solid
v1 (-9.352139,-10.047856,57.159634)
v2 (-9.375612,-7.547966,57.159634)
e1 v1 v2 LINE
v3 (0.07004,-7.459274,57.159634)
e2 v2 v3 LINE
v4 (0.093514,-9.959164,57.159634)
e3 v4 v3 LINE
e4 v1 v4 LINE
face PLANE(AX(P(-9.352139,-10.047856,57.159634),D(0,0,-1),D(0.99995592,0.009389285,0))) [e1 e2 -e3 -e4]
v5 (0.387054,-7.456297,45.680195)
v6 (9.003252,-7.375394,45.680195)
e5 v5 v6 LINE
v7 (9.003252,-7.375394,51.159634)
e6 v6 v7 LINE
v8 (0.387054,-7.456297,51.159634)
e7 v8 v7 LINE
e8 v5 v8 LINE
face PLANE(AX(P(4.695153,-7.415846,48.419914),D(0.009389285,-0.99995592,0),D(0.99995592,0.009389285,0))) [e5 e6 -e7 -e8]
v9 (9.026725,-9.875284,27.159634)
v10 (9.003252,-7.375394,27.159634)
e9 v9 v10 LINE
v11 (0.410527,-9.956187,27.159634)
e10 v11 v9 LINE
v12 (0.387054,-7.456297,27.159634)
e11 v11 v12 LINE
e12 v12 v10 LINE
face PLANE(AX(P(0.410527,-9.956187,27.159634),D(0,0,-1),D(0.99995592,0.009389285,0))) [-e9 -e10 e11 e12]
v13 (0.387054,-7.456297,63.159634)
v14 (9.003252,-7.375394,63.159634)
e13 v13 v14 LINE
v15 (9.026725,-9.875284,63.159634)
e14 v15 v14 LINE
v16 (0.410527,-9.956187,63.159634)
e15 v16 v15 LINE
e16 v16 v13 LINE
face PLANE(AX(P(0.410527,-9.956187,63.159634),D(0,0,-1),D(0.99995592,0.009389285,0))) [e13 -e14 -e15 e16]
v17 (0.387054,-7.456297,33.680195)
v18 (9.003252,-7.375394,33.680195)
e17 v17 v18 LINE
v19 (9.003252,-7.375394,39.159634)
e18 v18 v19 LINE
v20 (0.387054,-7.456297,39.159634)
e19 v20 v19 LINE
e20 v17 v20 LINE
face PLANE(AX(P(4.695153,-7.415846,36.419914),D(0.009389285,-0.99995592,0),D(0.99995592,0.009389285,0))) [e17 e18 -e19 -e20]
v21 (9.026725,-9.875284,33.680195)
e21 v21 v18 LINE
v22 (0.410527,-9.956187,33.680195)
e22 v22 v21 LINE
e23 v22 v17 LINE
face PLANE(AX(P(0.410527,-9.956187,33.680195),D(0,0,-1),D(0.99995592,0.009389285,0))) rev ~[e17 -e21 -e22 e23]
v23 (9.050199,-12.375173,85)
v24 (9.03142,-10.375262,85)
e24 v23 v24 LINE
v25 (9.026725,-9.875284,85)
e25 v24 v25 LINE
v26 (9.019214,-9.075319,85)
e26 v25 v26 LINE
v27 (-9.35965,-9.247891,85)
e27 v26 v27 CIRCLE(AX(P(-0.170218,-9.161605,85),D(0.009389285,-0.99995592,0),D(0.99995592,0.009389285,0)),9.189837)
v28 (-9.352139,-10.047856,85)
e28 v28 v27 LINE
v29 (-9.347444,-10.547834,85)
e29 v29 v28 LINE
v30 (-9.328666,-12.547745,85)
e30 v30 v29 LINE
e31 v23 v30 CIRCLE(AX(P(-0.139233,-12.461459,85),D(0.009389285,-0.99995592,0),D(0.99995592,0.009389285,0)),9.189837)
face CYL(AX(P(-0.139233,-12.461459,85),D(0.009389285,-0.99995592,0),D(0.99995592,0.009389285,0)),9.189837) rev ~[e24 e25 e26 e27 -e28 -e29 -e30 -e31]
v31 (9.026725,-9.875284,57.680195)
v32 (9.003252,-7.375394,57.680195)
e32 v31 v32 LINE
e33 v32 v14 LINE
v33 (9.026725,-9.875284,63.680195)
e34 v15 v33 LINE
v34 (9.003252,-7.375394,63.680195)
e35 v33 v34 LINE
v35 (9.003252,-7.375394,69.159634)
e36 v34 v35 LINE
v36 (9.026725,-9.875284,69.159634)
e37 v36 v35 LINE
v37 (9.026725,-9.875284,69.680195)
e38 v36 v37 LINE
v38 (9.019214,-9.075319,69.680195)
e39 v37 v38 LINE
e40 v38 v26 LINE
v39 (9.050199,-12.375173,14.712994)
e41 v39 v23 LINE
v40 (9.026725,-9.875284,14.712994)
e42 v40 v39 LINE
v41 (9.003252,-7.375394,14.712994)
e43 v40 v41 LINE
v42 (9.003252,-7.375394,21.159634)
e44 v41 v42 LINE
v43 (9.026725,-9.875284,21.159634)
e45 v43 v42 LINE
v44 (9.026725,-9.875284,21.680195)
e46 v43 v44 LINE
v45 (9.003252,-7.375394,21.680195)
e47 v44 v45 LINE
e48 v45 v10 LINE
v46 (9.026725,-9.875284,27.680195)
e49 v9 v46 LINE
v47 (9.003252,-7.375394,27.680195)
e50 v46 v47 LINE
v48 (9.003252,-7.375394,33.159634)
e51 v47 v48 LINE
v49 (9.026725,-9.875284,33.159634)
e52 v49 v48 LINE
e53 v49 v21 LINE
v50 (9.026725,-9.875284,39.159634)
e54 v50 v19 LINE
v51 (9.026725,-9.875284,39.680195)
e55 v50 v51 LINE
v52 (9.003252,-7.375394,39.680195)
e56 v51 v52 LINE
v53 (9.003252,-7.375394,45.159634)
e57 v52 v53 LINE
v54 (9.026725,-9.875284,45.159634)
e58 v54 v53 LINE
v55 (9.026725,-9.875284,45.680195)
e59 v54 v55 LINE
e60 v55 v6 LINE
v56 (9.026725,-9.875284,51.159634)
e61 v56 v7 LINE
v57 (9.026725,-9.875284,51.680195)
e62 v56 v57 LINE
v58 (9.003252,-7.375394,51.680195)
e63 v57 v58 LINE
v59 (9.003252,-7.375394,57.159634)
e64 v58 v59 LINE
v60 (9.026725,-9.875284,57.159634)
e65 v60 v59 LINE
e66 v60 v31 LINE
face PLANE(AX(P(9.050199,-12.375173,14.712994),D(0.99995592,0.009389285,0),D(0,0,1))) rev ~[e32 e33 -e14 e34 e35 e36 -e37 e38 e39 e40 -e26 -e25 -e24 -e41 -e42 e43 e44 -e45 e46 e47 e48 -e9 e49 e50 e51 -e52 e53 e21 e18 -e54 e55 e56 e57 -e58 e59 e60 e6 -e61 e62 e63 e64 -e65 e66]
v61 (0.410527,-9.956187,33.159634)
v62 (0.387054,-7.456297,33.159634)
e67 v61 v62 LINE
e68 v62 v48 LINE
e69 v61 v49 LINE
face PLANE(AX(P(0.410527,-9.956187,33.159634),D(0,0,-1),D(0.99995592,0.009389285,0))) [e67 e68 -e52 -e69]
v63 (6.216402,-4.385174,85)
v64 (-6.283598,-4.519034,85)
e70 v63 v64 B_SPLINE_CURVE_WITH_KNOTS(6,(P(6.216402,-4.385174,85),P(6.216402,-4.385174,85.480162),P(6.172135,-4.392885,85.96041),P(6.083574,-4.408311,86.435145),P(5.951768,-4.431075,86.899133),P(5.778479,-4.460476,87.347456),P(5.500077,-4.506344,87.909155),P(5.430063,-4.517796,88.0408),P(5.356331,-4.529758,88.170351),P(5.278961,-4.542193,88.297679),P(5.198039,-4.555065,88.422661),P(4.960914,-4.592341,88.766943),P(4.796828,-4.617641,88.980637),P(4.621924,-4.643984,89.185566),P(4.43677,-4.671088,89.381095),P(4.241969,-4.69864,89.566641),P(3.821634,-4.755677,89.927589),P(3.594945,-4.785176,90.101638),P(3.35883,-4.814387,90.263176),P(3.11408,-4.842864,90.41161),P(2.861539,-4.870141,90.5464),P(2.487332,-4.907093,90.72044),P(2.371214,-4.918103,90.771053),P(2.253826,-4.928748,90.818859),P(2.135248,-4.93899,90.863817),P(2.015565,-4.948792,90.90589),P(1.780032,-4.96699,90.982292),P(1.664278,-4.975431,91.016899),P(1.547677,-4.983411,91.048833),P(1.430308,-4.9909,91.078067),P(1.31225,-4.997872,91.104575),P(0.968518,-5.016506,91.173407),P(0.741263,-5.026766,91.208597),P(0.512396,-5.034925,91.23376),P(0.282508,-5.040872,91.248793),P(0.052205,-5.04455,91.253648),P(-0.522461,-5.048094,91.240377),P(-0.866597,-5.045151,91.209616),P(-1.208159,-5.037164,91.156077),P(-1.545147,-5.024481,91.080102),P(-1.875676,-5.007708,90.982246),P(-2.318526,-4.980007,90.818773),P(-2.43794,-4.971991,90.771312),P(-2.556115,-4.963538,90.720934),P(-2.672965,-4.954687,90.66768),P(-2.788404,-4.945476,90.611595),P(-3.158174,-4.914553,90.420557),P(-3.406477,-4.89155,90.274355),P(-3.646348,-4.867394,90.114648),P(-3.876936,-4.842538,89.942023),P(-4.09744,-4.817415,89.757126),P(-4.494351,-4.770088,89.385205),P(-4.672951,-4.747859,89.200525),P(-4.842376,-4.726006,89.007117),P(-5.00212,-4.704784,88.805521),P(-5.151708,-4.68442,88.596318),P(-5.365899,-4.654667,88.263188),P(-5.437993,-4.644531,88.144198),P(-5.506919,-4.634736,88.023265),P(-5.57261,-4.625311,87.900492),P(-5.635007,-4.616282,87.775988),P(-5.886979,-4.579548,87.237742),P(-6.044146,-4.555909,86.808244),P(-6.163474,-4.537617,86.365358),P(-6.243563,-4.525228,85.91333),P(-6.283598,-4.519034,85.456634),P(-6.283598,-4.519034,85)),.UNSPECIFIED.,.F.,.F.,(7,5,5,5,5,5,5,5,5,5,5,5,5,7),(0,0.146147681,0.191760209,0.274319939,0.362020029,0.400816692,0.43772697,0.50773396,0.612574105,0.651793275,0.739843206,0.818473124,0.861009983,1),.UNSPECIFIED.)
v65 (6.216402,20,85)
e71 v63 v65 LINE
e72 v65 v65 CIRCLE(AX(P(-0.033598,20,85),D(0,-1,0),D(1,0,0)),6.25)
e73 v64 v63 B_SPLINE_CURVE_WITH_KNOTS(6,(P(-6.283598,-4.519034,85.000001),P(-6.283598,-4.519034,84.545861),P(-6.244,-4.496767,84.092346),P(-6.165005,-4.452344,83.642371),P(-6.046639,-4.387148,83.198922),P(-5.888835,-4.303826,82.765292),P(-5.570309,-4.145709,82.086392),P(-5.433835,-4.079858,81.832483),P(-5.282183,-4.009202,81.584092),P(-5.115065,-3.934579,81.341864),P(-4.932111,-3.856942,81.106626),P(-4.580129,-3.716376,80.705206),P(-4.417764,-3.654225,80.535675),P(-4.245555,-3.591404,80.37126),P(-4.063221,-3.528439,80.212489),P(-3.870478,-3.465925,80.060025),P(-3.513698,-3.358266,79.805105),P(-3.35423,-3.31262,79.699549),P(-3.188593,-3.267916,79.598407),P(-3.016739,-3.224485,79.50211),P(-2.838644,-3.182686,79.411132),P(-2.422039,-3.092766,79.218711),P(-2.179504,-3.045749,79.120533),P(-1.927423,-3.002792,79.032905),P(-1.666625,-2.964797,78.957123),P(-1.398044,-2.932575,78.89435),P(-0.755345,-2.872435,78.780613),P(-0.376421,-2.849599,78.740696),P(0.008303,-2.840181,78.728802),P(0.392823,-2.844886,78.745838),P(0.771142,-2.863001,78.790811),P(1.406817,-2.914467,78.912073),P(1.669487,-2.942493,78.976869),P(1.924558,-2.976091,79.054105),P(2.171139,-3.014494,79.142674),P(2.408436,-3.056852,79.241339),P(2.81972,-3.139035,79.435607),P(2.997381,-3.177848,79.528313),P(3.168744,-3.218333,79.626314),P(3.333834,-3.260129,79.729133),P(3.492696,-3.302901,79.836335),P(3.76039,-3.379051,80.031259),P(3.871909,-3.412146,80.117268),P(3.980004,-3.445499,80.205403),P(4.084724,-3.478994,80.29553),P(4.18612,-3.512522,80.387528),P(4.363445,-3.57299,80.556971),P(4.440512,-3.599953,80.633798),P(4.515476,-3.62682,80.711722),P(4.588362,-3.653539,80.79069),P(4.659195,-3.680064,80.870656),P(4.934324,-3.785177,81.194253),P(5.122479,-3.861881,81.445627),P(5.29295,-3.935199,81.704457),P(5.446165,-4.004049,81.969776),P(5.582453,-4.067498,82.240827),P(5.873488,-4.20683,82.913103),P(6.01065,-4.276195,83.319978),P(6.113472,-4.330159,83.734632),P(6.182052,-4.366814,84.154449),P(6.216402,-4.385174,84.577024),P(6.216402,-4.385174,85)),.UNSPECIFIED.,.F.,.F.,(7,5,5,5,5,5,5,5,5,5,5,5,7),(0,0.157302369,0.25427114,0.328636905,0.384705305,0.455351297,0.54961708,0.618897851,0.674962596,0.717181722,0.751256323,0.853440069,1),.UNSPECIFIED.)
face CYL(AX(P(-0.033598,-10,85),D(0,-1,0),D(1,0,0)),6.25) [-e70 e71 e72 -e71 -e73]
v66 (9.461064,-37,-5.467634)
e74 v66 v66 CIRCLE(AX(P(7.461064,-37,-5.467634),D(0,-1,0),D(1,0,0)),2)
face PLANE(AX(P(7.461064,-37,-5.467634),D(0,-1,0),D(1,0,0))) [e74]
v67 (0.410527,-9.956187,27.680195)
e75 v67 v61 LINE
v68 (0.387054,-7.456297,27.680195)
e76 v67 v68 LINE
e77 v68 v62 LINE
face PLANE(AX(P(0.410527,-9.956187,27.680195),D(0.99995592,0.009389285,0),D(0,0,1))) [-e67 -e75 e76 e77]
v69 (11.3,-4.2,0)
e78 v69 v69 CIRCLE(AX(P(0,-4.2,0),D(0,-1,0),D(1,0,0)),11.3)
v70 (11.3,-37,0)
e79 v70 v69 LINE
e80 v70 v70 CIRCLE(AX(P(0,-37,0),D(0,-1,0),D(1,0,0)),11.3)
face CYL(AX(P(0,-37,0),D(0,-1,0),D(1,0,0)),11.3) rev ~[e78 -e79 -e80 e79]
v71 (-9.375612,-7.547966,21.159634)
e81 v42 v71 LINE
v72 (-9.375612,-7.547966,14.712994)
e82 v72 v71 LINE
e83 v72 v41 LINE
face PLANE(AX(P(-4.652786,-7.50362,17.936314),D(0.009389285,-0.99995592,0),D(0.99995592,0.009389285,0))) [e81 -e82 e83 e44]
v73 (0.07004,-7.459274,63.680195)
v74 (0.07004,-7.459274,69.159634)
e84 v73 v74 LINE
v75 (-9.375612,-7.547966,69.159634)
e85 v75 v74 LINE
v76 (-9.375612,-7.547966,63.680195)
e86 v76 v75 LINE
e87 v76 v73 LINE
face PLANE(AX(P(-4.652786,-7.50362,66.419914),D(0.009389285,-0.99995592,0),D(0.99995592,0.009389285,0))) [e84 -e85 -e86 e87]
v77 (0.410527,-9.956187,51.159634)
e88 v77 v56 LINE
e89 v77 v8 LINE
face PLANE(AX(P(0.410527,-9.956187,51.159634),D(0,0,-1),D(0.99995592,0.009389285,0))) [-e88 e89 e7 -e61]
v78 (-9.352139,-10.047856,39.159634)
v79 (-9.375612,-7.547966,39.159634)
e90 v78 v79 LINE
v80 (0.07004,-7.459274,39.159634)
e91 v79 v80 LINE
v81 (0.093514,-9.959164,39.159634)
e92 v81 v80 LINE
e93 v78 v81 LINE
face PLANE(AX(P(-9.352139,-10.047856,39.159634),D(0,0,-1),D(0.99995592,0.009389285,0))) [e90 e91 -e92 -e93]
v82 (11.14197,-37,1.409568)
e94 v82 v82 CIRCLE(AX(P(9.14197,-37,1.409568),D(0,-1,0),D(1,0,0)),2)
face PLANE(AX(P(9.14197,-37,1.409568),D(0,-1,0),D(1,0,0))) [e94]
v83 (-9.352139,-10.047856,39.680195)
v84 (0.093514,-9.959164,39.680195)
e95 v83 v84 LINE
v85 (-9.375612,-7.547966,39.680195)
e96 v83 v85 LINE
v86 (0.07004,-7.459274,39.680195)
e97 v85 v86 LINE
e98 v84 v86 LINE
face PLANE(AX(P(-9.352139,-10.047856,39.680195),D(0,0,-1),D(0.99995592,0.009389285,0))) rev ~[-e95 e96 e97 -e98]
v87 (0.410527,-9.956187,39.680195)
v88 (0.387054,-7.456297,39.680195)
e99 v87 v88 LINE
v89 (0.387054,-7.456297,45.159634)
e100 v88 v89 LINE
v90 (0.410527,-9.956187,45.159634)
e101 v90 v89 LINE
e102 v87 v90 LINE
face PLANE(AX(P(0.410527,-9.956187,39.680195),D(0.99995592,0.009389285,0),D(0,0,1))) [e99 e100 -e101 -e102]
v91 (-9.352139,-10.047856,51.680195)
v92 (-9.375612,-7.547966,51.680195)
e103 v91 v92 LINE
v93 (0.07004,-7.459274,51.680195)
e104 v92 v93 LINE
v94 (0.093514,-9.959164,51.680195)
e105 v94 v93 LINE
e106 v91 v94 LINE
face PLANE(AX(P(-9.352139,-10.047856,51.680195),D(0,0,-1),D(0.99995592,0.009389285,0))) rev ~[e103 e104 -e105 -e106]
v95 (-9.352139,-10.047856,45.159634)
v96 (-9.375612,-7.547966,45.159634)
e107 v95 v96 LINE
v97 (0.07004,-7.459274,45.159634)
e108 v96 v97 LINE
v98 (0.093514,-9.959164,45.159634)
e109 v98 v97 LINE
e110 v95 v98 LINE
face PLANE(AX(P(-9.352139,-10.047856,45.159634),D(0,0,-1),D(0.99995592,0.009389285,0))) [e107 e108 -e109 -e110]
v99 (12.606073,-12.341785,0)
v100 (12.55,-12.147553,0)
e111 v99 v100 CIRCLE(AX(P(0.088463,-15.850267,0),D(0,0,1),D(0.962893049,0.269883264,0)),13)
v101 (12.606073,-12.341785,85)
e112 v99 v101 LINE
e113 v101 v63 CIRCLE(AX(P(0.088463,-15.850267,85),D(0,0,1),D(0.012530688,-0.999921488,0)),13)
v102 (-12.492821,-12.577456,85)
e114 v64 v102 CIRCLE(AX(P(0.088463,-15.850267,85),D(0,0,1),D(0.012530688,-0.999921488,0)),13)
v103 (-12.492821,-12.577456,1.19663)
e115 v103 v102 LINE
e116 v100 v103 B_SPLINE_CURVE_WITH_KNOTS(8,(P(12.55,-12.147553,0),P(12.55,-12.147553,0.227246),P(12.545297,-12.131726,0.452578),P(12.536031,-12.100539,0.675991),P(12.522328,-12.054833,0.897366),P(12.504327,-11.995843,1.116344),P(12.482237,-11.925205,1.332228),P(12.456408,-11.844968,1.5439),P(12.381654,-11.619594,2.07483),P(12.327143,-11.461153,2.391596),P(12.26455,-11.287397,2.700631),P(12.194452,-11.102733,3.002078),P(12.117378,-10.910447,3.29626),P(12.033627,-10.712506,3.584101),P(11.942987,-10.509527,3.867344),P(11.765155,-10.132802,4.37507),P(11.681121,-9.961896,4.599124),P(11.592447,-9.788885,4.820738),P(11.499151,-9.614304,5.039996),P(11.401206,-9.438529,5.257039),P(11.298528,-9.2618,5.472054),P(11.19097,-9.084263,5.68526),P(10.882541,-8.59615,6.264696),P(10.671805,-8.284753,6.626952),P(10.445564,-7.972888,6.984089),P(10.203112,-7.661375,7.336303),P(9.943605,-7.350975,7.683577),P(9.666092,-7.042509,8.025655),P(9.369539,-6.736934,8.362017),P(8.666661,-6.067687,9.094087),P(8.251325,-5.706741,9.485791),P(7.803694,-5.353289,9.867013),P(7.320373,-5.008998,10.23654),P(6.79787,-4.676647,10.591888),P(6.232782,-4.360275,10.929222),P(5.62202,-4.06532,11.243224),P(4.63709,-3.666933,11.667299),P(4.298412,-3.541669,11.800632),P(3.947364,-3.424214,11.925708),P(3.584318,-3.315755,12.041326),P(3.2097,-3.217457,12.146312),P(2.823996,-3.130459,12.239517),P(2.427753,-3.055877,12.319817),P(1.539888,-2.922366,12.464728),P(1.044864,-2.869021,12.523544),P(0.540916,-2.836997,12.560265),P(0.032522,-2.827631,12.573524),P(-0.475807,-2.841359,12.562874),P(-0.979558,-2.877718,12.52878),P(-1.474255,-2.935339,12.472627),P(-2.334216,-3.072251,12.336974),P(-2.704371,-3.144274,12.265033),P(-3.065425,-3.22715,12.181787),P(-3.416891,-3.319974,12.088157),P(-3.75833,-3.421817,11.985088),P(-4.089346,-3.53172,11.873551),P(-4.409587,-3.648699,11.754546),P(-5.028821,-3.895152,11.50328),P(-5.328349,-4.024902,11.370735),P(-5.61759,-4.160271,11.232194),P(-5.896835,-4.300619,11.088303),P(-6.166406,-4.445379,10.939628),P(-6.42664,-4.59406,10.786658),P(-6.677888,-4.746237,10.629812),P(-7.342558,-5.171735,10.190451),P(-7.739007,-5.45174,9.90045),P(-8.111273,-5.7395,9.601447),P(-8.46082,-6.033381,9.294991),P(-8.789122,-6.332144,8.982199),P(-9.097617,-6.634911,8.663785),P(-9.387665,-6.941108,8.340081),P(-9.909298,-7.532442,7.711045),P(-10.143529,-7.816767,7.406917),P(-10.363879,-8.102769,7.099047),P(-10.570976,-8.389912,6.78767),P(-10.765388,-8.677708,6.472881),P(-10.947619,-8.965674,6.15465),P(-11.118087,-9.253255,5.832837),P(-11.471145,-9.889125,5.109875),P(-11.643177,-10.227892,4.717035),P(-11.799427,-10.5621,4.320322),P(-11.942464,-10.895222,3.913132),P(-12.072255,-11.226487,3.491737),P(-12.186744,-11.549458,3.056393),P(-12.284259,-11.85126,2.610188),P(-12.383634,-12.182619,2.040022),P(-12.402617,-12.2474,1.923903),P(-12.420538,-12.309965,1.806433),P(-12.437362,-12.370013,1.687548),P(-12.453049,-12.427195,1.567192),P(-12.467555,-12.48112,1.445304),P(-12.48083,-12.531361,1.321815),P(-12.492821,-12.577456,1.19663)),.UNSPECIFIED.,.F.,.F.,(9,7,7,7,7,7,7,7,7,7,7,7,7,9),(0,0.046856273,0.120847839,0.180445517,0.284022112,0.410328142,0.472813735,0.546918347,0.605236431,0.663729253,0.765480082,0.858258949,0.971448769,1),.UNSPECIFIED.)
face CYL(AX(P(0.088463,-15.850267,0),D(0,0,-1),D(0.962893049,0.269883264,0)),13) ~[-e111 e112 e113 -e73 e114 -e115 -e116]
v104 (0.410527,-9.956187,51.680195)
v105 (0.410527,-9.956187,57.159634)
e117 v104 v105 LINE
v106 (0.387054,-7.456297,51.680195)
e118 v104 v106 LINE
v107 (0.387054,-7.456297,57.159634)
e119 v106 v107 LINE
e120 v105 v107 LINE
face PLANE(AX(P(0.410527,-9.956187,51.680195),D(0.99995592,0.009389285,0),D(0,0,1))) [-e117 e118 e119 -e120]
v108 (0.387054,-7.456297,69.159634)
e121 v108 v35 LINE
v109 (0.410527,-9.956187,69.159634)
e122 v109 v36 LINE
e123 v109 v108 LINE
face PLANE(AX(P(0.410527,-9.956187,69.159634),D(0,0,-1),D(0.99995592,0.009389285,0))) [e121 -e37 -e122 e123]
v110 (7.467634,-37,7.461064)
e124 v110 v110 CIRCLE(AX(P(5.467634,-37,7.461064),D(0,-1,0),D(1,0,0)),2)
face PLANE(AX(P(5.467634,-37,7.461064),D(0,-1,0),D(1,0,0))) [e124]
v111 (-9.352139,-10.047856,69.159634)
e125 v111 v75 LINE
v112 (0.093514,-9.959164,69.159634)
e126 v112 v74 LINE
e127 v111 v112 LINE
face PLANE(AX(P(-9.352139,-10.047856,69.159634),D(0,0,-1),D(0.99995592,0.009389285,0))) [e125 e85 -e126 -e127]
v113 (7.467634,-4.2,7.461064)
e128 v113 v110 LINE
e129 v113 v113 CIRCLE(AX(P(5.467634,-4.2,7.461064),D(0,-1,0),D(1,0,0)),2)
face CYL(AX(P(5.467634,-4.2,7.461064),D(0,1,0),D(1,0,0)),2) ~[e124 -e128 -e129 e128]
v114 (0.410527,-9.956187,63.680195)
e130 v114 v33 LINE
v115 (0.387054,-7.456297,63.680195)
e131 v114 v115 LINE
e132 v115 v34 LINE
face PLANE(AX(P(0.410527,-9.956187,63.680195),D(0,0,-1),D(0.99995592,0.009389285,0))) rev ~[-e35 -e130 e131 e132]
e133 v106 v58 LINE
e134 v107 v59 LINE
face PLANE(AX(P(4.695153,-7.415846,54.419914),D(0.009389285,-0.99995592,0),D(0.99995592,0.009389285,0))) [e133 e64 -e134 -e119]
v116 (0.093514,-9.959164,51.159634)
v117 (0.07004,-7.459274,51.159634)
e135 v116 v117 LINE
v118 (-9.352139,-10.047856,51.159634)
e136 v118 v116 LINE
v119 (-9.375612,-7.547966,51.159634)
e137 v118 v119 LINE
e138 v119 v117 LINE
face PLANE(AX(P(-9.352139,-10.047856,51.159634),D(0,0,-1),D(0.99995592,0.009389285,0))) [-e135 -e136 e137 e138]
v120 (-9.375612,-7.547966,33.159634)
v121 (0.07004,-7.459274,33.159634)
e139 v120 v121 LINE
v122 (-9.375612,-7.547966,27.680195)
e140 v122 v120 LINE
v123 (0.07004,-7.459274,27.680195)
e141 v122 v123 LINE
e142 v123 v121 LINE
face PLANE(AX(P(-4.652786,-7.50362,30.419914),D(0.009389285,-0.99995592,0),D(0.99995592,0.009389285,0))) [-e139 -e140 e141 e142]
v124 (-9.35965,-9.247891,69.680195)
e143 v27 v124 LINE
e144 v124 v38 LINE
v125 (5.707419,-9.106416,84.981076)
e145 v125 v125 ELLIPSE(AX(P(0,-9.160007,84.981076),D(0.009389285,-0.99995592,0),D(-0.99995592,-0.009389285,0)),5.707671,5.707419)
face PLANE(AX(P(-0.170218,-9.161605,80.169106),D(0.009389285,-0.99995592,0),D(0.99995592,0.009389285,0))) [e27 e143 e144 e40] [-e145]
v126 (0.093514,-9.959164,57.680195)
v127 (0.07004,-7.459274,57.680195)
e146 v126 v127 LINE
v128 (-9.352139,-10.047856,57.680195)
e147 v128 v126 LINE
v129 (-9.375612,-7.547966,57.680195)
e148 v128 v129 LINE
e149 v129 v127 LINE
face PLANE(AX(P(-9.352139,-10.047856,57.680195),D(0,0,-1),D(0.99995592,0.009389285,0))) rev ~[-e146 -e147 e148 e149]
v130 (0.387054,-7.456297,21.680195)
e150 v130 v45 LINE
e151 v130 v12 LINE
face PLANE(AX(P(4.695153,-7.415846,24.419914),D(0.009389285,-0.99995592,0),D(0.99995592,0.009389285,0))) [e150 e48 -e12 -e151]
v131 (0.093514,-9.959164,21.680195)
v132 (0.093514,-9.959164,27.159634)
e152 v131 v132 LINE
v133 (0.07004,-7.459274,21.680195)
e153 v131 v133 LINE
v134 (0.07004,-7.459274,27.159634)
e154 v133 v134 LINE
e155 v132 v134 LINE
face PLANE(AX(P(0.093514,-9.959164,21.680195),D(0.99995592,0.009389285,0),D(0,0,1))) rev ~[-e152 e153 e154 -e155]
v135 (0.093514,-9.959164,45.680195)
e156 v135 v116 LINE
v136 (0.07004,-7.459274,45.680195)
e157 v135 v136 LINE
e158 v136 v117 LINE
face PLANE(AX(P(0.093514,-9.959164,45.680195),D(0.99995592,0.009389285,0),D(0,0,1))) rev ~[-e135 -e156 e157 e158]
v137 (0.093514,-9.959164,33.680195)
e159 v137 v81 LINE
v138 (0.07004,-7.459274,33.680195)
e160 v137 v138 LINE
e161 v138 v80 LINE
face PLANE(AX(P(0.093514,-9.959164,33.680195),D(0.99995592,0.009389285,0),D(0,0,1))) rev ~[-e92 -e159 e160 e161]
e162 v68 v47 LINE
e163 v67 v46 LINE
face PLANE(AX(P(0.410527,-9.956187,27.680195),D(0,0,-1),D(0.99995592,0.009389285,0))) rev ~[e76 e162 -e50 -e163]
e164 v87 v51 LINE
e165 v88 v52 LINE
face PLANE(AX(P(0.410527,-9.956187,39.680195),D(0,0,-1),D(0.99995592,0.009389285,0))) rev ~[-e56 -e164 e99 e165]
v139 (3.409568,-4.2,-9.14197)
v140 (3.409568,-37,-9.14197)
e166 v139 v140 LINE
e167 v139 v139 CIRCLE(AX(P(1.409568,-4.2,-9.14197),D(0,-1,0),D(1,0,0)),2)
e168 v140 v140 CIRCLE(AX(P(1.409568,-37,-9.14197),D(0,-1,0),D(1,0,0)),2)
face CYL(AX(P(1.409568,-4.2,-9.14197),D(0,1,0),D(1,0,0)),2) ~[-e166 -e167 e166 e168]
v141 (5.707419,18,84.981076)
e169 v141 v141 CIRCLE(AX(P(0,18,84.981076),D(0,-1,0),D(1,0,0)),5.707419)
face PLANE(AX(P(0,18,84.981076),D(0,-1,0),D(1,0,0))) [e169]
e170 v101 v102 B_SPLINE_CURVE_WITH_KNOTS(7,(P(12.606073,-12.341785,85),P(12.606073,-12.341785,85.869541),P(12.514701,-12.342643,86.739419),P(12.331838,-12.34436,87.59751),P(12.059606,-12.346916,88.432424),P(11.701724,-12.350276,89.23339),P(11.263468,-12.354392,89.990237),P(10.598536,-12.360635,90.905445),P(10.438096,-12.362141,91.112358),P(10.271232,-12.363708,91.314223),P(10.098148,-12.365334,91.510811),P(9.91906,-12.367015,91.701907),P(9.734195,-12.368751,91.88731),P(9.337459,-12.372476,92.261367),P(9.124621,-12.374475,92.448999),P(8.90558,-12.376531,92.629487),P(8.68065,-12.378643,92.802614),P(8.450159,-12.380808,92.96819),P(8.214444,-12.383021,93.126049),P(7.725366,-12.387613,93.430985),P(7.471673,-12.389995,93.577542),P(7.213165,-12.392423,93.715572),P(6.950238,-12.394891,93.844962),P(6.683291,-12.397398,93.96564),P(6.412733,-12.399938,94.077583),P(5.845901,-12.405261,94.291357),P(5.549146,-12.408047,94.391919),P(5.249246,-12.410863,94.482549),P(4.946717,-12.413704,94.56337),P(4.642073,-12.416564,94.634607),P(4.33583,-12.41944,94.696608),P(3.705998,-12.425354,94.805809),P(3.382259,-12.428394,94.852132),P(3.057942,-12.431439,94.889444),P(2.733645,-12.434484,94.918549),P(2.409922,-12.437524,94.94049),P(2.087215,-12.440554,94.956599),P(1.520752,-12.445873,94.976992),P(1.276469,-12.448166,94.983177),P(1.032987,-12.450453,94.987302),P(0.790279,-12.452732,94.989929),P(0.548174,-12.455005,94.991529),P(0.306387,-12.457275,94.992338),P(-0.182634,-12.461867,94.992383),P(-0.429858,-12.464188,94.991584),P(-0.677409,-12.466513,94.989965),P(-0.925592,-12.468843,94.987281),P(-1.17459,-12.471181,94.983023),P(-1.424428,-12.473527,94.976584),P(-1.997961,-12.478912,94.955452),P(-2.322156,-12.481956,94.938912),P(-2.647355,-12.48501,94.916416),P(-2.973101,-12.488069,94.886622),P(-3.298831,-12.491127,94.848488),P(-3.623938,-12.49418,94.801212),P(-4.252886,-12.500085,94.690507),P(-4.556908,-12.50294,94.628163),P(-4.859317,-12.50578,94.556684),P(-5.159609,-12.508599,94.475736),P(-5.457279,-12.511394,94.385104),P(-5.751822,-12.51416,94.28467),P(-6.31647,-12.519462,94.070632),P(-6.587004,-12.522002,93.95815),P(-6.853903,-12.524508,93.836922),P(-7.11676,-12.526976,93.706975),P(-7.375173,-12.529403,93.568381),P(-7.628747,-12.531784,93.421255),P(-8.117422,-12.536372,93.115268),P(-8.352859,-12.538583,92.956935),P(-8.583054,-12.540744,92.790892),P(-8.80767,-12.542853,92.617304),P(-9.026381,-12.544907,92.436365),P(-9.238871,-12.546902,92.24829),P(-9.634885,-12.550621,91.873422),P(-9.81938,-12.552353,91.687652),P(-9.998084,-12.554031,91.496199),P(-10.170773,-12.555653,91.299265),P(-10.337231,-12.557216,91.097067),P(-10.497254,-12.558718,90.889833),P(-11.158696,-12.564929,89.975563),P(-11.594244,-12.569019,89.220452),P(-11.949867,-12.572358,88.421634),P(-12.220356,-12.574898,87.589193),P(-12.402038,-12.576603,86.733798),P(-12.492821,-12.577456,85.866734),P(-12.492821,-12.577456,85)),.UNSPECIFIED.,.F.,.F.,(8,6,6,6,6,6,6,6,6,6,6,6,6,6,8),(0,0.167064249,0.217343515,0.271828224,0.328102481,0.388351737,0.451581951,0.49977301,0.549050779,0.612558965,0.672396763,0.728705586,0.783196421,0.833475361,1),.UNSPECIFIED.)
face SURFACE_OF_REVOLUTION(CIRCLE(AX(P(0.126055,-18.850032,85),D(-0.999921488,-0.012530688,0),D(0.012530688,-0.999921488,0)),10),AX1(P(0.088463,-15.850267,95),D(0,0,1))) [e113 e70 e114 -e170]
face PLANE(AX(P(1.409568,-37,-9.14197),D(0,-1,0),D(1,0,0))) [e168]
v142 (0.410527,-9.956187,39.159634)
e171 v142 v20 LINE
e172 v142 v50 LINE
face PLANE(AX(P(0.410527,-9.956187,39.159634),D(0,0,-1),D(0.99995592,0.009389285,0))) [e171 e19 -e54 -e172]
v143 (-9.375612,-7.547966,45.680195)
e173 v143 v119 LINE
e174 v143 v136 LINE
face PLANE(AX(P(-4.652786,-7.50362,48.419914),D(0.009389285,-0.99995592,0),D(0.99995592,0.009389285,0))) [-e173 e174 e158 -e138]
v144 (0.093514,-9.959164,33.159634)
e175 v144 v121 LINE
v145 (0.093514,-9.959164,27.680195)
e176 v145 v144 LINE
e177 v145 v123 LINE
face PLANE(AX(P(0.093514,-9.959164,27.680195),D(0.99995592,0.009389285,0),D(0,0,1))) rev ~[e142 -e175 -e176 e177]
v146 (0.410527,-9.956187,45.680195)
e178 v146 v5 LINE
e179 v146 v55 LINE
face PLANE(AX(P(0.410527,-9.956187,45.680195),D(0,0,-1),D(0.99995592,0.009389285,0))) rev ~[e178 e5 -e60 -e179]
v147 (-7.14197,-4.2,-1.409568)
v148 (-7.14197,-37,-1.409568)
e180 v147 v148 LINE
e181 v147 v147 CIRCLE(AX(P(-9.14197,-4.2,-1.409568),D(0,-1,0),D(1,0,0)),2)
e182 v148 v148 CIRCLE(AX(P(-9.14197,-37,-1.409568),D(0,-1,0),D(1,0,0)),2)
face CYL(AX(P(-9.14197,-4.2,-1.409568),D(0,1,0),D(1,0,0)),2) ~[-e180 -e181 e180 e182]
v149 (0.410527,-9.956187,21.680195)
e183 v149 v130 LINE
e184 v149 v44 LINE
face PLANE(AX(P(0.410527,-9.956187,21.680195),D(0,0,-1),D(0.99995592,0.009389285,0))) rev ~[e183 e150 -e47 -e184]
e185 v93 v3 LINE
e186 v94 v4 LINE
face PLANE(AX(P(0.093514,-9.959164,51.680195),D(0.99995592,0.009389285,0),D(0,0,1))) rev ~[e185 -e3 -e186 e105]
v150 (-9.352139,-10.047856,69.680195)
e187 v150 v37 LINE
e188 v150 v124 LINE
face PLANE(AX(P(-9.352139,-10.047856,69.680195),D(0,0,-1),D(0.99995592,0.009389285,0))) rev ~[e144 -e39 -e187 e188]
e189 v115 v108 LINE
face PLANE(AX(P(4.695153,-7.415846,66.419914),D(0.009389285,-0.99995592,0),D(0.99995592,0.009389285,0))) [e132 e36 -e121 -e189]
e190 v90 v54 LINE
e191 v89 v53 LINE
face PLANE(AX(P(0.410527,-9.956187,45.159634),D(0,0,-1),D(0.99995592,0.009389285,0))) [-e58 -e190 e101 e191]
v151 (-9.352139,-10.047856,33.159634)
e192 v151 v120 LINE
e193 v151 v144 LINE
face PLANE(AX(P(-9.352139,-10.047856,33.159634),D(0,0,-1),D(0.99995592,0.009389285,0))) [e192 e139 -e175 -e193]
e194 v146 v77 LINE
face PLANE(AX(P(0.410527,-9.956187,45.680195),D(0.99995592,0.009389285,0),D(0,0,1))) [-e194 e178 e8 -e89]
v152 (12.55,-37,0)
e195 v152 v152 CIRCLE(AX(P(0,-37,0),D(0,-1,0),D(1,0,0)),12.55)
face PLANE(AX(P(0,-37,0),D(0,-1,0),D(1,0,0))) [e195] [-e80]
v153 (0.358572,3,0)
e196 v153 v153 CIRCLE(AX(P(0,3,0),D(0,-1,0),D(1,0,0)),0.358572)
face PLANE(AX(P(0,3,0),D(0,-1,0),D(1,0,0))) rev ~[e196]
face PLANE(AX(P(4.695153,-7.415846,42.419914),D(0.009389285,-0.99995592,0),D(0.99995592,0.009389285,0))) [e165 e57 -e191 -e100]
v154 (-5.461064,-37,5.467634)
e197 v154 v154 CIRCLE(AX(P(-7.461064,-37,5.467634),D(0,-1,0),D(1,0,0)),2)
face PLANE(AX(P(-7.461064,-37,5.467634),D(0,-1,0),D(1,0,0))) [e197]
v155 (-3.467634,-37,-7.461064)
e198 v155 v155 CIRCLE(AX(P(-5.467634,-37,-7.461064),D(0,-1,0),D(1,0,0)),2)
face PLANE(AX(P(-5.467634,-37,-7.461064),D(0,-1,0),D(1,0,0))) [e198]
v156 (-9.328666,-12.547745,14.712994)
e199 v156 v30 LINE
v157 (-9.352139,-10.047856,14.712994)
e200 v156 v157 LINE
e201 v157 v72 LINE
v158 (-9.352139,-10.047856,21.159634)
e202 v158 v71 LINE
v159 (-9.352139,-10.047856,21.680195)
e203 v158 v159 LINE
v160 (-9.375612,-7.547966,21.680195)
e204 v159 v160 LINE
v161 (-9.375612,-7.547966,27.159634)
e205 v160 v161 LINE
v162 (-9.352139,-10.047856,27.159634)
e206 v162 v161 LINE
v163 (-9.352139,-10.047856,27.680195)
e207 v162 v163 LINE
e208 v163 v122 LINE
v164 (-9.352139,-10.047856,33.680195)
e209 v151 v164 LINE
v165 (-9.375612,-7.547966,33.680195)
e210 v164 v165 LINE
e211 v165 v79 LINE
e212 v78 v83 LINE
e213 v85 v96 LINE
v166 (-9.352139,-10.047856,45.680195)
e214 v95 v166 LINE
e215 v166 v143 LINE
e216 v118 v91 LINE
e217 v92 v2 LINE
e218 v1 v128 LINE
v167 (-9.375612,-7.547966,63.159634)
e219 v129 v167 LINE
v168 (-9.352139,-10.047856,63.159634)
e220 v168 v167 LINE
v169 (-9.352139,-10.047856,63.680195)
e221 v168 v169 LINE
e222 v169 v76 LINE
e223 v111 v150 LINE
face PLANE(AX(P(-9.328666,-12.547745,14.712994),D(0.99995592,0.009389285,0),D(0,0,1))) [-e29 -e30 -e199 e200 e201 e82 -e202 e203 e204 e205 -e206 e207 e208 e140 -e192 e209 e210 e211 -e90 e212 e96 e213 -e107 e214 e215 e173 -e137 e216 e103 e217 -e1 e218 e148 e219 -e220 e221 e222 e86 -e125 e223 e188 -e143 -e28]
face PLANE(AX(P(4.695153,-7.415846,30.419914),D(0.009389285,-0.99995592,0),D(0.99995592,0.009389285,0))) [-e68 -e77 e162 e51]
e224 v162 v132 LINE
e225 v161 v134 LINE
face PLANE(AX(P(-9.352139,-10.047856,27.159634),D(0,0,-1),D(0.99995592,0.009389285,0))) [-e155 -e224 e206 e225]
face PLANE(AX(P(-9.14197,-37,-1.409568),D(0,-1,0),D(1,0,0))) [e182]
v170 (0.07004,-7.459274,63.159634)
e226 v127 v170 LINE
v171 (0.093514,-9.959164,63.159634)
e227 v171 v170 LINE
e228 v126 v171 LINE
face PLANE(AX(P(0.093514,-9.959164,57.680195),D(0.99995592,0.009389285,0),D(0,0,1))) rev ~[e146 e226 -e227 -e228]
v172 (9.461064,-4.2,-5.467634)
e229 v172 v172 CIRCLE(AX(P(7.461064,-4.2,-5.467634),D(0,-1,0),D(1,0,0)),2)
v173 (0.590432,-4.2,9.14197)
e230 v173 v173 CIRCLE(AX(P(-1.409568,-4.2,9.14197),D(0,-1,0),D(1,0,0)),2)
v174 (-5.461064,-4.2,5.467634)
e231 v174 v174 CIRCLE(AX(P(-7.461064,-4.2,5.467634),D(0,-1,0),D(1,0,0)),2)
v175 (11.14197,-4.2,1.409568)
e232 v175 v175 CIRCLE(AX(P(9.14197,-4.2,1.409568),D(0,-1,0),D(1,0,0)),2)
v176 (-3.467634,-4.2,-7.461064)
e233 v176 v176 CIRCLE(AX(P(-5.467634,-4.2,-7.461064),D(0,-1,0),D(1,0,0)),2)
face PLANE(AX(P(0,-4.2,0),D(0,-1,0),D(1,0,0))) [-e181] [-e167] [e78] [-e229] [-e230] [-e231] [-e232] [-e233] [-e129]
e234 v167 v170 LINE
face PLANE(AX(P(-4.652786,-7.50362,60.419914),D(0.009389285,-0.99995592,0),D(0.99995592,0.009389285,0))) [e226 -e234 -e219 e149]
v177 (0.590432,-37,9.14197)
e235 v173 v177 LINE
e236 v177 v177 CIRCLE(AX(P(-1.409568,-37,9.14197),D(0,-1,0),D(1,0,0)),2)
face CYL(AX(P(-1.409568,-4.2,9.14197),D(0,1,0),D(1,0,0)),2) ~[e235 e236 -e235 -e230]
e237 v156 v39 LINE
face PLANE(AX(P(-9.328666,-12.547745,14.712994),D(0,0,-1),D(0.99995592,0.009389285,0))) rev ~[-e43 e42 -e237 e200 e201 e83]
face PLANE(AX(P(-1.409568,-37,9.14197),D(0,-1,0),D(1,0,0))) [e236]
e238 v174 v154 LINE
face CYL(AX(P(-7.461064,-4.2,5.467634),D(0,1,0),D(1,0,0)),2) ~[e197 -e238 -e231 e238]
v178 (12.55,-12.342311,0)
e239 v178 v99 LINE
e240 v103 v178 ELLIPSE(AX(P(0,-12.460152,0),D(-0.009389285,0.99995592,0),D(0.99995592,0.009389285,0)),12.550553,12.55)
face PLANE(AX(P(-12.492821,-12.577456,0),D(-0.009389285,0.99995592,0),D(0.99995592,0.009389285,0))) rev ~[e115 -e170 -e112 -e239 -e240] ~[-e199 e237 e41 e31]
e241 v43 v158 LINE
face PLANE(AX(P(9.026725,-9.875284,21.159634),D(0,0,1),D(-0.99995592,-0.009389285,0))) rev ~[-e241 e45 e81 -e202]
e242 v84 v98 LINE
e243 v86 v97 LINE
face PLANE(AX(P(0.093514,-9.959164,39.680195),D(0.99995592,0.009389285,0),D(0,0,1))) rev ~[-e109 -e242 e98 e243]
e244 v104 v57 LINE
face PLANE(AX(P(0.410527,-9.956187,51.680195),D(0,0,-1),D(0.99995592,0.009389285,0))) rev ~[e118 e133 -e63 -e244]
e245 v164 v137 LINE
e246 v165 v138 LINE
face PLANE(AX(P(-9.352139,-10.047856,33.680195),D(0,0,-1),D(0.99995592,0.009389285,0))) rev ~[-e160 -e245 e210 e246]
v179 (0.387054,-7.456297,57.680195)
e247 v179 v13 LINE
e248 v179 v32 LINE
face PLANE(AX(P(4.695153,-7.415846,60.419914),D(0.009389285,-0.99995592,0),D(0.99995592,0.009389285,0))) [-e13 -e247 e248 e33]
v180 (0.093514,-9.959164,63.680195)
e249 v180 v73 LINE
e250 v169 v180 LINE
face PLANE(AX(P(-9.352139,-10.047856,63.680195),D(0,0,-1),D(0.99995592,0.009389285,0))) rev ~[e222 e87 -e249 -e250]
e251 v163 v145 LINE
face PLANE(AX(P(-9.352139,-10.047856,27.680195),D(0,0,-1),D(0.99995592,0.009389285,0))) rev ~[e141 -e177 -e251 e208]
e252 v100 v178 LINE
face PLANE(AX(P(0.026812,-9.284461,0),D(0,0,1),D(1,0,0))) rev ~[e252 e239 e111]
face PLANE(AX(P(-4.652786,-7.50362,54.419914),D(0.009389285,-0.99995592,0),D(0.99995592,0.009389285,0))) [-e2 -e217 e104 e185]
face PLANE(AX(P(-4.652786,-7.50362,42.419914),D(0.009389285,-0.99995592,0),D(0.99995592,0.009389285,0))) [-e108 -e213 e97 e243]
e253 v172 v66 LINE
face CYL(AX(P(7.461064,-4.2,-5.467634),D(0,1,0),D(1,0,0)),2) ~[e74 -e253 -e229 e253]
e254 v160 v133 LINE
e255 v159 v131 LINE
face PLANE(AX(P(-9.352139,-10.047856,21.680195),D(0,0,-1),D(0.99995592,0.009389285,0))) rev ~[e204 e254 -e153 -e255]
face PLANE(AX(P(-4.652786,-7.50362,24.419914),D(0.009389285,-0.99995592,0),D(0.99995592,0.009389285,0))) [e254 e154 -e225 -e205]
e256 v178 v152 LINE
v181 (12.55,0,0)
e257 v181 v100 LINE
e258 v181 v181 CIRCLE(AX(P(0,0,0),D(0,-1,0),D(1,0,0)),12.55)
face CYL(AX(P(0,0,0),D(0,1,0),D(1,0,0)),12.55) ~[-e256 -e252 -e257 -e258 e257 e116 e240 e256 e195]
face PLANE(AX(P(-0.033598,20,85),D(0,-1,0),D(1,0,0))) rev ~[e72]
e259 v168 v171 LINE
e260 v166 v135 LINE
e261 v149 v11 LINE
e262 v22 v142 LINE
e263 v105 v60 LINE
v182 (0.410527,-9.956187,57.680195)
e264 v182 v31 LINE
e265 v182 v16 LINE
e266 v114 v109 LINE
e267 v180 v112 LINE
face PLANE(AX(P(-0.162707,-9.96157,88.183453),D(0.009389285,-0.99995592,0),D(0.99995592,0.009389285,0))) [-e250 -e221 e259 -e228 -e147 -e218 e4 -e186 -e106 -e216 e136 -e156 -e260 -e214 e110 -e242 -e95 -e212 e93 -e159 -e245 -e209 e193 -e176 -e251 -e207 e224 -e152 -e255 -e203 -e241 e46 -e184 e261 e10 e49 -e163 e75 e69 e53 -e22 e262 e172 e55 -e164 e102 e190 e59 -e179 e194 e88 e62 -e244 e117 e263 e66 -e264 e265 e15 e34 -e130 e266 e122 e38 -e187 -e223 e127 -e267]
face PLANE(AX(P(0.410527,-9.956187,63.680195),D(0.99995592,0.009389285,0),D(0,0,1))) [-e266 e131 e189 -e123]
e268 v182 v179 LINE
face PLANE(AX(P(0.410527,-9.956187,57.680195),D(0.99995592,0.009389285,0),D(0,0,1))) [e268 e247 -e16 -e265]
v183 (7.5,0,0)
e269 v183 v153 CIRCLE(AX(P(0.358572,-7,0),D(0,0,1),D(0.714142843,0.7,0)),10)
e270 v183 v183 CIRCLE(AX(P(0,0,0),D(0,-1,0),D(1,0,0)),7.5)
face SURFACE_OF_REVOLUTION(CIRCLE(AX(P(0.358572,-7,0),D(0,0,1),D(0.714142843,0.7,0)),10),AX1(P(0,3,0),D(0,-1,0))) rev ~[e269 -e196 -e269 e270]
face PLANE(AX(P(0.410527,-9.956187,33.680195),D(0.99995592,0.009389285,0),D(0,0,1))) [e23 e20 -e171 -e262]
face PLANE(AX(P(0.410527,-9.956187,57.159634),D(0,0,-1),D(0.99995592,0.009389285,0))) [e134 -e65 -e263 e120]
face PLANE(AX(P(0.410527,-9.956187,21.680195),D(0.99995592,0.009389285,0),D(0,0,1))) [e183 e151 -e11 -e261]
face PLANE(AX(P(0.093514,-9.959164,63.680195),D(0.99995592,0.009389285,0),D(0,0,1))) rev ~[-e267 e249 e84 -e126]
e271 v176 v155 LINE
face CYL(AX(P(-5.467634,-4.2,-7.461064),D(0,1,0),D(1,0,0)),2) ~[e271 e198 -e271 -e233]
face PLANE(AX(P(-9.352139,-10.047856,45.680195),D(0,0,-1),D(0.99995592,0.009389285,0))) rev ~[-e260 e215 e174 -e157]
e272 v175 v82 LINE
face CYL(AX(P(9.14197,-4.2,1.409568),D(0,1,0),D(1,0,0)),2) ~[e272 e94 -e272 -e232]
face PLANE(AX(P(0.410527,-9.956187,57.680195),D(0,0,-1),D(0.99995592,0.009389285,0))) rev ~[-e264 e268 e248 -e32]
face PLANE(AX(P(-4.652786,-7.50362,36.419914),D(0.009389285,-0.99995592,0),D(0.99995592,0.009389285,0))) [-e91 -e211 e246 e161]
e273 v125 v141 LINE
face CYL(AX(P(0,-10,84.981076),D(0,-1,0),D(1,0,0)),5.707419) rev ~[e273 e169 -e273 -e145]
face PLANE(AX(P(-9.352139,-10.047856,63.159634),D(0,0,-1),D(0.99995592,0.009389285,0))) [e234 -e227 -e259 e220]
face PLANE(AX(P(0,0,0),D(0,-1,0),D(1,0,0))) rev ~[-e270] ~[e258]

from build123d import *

# Parameters (mm, degrees)
F0_R        = 12.55
F1_DEPTH    = 37
F2_R        = 7.5
F3_DEPTH    = 3
F6_DEPTH    = 95
F7_T2_ANGLE = 359.64
F9_R        = 6.25
F10_DEPTH   = 30
F11_W       = 18.3796742931
F11_H       = 70.2870060131
F12_DEPTH   = 2
F13_DEPTH   = 2.5
F14_W       = 9.4460686669
F14_H       = 6.4466400072
F14_H_2     = 5.4794391096
F14_W_2     = 8.6165779212
F14_W_3     = 0.317027705
F15_DEPTH   = 2.5
F16_DEPTH   = 0.8
F17_R       = 5.7074191609
F18_DEPTH   = 28
F19_R       = 11.3
F20_DEPTH   = 32.8
F21_R       = 2
F22_DEPTH   = 32.8


# Not quite as in the source:
# - a fillet or chamfer that OpenCascade refuses, or shapes differently, is made with other operations: its cross-section is extruded or revolved along the edge and cut away or added


with BuildPart() as f1:
    # F0 (on Front) → F1 (new body)
    with BuildSketch(Plane.XZ):
        Circle(F0_R)
    extrude(amount=F1_DEPTH)

    # F2 (on Front) → F3 (join)
    with BuildSketch(Plane.XZ):
        Circle(F2_R)
    extrude(amount=-F3_DEPTH)

    # F4: fillet of radius 10 on 1 edges, made by hand

    # F4_s1 → F4_t2 (revolve, cut)
    with BuildSketch(Plane.XY):
        with BuildLine():
            ThreePointArc((7.5, 0), (4.2315549177, 2.2195444573), (0.3585715715, 3))
            Line((0.3585715715, 3), (7.5, 3))
            Line((7.5, 3), (7.5, 0))
        make_face()
    revolve(axis=Axis((0, 3, 0), (0, -1, 0)), mode=Mode.SUBTRACT)

    # F5 (on Top) → F6 (join)
    with BuildSketch(Plane.XY):
        with BuildLine():
            Line((-12.4928209826, -12.5774559094), (12.6060726016, -12.3417848491))
            ThreePointArc((12.6060726016, -12.3417848491), (-0.0335977446, -2.8508403226), (-12.4928209826, -12.5774559094))
        make_face()
    extrude(amount=F6_DEPTH)

    # F7: fillet of radius 10 on 1 edges, made by hand

    # F7_s1 → F7_t2 (revolve, cut)
    with BuildSketch(Plane(origin=(-0.1101500857, -0.0013803647, 0), x_dir=(0, 0, 1), z_dir=(-0.9999214878, -0.0125306879, 0))):
        with BuildLine():
            ThreePointArc((85, -28.8501313418), (92.0710678119, -25.9211991536), (95, -18.8501313418))
            Line((95, -18.8501313418), (95, -28.8501313418))
            Line((95, -28.8501313418), (85, -28.8501313418))
        make_face()
    revolve(axis=Axis((0.0884629639, -15.8502672786, 95), (0, 0, 1)), revolution_arc=F7_T2_ANGLE, mode=Mode.SUBTRACT)

    # F9 (on offset) → F10 (join)
    with BuildSketch(Plane.XZ.offset(10)):
        with Locations((-0.0335977446, 85)):
            Circle(F9_R)
    extrude(amount=-F10_DEPTH)

    # F11 (on face) → F12 (cut)
    with BuildSketch(Plane(origin=(0.1169867653, -12.4590536081, 0), x_dir=(0.9999559197, 0.0093892853, 0), z_dir=(0.0093892853, -0.9999559197, 0))):
        with Locations((-0.2562315203, 49.8564969935)):
            Rectangle(F11_W, F11_H)
    extrude(amount=-F12_DEPTH, mode=Mode.SUBTRACT)

    # F11 (on face) → F13 (cut)
    with BuildSketch(Plane(origin=(0.1169867653, -12.4590536081, 0), x_dir=(0.9999559197, 0.0093892853, 0), z_dir=(0.0093892853, -0.9999559197, 0))):
        with BuildLine():
            ThreePointArc((8.9336056262, 85), (-0.2562315203, 94.1898371466), (-9.4460686669, 85))
            Line((-9.4460686669, 85), (8.9336056262, 85))
        make_face()
        with Locations((-0.2562315203, 49.8564969935)):
            Rectangle(F11_W, F11_H)
    extrude(amount=-F13_DEPTH, mode=Mode.SUBTRACT)

    # F14 (on face) → F15 (cut)
    with BuildSketch(Plane(origin=(0.0935135522, -9.9591638088, 0), x_dir=(0.9999559197, 0.0093892853, 0), z_dir=(0.0093892853, -0.9999559197, 0))):
        with Locations((-4.7230343334, 17.9363139905)):
            Rectangle(F14_W, F14_H)
        with Locations((-4.7230343334, 24.4199144393)):
            Rectangle(F14_W, F14_H_2)
        with Locations((-4.7230343334, 30.4199144393)):
            Rectangle(F14_W, F14_H_2)
        with Locations((-4.7230343334, 36.4199144393)):
            Rectangle(F14_W, F14_H_2)
        with Locations((-4.7230343334, 42.4199144393)):
            Rectangle(F14_W, F14_H_2)
        with Locations((-4.7230343334, 48.4199144393)):
            Rectangle(F14_W, F14_H_2)
        with Locations((-4.7230343334, 54.4199144393)):
            Rectangle(F14_W, F14_H_2)
        with Locations((-4.7230343334, 60.4199144393)):
            Rectangle(F14_W, F14_H_2)
        with Locations((-4.7230343334, 66.4199144393)):
            Rectangle(F14_W, F14_H_2)
        with Locations((4.6253166656, 66.4199144393)):
            Rectangle(F14_W_2, F14_H_2)
        with Locations((4.6253166656, 60.4199144393)):
            Rectangle(F14_W_2, F14_H_2)
        with Locations((4.6253166656, 54.4199144393)):
            Rectangle(F14_W_2, F14_H_2)
        with Locations((4.6253166656, 48.4199144393)):
            Rectangle(F14_W_2, F14_H_2)
        with Locations((4.6253166656, 42.4199144393)):
            Rectangle(F14_W_2, F14_H_2)
        with Locations((4.6253166656, 36.4199144393)):
            Rectangle(F14_W_2, F14_H_2)
        with Locations((4.6253166656, 30.4199144393)):
            Rectangle(F14_W_2, F14_H_2)
        with Locations((4.6253166656, 24.4199144393)):
            Rectangle(F14_W_2, F14_H_2)
        with Locations((0.1585138525, 17.9363139905)):
            Rectangle(F14_W_3, F14_H)
        with Locations((4.6253166656, 17.9363139905)):
            Rectangle(F14_W_2, F14_H)
    extrude(amount=-F15_DEPTH, mode=Mode.SUBTRACT)

    # F14 (on face) → F16 (cut)
    with BuildSketch(Plane(origin=(0.0935135522, -9.9591638088, 0), x_dir=(0.9999559197, 0.0093892853, 0), z_dir=(0.0093892853, -0.9999559197, 0))):
        with BuildLine():
            Line((-9.4460686669, 85), (-9.4460686669, 69.6801948845))
            Line((-9.4460686669, 69.6801948845), (0, 69.6801948845))
            Line((0, 69.6801948845), (0.317027705, 69.6801948845))
            Line((0.317027705, 69.6801948845), (8.9336056262, 69.6801948845))
            Line((8.9336056262, 69.6801948845), (8.9336056262, 85))
            ThreePointArc((8.9336056262, 85), (-0.2562315203, 94.1898371466), (-9.4460686669, 85))
        make_face()
    extrude(amount=-F16_DEPTH, mode=Mode.SUBTRACT)

    # F17 (on face) → F18 (cut)
    with BuildSketch(Plane.XZ.offset(10)):
        with Locations((0, 84.9810764194)):
            Circle(F17_R)
    extrude(amount=-F18_DEPTH, mode=Mode.SUBTRACT)

    # F19 (on face) → F20 (cut)
    with BuildSketch(Plane.XZ.offset(37)):
        Circle(F19_R)
    extrude(amount=-F20_DEPTH, mode=Mode.SUBTRACT)

    # F21 (on face) → F22 (join)
    with BuildSketch(Plane.XZ.offset(4.2)):
        with Locations((-7.4610639253, 5.4676343242)):
            Circle(F21_R)
        with Locations((-9.1419702041, -1.4095675888)):
            Circle(F21_R)
        with Locations((-5.4676343242, -7.4610639253)):
            Circle(F21_R)
        with Locations((1.4095675888, -9.1419702041)):
            Circle(F21_R)
        with Locations((7.4610639253, -5.4676343242)):
            Circle(F21_R)
        with Locations((9.1419702041, 1.4095675888)):
            Circle(F21_R)
        with Locations((5.4676343242, 7.4610639253)):
            Circle(F21_R)
        with Locations((-1.4095675888, 9.1419702041)):
            Circle(F21_R)
    extrude(amount=F22_DEPTH)


solid = f1.part
